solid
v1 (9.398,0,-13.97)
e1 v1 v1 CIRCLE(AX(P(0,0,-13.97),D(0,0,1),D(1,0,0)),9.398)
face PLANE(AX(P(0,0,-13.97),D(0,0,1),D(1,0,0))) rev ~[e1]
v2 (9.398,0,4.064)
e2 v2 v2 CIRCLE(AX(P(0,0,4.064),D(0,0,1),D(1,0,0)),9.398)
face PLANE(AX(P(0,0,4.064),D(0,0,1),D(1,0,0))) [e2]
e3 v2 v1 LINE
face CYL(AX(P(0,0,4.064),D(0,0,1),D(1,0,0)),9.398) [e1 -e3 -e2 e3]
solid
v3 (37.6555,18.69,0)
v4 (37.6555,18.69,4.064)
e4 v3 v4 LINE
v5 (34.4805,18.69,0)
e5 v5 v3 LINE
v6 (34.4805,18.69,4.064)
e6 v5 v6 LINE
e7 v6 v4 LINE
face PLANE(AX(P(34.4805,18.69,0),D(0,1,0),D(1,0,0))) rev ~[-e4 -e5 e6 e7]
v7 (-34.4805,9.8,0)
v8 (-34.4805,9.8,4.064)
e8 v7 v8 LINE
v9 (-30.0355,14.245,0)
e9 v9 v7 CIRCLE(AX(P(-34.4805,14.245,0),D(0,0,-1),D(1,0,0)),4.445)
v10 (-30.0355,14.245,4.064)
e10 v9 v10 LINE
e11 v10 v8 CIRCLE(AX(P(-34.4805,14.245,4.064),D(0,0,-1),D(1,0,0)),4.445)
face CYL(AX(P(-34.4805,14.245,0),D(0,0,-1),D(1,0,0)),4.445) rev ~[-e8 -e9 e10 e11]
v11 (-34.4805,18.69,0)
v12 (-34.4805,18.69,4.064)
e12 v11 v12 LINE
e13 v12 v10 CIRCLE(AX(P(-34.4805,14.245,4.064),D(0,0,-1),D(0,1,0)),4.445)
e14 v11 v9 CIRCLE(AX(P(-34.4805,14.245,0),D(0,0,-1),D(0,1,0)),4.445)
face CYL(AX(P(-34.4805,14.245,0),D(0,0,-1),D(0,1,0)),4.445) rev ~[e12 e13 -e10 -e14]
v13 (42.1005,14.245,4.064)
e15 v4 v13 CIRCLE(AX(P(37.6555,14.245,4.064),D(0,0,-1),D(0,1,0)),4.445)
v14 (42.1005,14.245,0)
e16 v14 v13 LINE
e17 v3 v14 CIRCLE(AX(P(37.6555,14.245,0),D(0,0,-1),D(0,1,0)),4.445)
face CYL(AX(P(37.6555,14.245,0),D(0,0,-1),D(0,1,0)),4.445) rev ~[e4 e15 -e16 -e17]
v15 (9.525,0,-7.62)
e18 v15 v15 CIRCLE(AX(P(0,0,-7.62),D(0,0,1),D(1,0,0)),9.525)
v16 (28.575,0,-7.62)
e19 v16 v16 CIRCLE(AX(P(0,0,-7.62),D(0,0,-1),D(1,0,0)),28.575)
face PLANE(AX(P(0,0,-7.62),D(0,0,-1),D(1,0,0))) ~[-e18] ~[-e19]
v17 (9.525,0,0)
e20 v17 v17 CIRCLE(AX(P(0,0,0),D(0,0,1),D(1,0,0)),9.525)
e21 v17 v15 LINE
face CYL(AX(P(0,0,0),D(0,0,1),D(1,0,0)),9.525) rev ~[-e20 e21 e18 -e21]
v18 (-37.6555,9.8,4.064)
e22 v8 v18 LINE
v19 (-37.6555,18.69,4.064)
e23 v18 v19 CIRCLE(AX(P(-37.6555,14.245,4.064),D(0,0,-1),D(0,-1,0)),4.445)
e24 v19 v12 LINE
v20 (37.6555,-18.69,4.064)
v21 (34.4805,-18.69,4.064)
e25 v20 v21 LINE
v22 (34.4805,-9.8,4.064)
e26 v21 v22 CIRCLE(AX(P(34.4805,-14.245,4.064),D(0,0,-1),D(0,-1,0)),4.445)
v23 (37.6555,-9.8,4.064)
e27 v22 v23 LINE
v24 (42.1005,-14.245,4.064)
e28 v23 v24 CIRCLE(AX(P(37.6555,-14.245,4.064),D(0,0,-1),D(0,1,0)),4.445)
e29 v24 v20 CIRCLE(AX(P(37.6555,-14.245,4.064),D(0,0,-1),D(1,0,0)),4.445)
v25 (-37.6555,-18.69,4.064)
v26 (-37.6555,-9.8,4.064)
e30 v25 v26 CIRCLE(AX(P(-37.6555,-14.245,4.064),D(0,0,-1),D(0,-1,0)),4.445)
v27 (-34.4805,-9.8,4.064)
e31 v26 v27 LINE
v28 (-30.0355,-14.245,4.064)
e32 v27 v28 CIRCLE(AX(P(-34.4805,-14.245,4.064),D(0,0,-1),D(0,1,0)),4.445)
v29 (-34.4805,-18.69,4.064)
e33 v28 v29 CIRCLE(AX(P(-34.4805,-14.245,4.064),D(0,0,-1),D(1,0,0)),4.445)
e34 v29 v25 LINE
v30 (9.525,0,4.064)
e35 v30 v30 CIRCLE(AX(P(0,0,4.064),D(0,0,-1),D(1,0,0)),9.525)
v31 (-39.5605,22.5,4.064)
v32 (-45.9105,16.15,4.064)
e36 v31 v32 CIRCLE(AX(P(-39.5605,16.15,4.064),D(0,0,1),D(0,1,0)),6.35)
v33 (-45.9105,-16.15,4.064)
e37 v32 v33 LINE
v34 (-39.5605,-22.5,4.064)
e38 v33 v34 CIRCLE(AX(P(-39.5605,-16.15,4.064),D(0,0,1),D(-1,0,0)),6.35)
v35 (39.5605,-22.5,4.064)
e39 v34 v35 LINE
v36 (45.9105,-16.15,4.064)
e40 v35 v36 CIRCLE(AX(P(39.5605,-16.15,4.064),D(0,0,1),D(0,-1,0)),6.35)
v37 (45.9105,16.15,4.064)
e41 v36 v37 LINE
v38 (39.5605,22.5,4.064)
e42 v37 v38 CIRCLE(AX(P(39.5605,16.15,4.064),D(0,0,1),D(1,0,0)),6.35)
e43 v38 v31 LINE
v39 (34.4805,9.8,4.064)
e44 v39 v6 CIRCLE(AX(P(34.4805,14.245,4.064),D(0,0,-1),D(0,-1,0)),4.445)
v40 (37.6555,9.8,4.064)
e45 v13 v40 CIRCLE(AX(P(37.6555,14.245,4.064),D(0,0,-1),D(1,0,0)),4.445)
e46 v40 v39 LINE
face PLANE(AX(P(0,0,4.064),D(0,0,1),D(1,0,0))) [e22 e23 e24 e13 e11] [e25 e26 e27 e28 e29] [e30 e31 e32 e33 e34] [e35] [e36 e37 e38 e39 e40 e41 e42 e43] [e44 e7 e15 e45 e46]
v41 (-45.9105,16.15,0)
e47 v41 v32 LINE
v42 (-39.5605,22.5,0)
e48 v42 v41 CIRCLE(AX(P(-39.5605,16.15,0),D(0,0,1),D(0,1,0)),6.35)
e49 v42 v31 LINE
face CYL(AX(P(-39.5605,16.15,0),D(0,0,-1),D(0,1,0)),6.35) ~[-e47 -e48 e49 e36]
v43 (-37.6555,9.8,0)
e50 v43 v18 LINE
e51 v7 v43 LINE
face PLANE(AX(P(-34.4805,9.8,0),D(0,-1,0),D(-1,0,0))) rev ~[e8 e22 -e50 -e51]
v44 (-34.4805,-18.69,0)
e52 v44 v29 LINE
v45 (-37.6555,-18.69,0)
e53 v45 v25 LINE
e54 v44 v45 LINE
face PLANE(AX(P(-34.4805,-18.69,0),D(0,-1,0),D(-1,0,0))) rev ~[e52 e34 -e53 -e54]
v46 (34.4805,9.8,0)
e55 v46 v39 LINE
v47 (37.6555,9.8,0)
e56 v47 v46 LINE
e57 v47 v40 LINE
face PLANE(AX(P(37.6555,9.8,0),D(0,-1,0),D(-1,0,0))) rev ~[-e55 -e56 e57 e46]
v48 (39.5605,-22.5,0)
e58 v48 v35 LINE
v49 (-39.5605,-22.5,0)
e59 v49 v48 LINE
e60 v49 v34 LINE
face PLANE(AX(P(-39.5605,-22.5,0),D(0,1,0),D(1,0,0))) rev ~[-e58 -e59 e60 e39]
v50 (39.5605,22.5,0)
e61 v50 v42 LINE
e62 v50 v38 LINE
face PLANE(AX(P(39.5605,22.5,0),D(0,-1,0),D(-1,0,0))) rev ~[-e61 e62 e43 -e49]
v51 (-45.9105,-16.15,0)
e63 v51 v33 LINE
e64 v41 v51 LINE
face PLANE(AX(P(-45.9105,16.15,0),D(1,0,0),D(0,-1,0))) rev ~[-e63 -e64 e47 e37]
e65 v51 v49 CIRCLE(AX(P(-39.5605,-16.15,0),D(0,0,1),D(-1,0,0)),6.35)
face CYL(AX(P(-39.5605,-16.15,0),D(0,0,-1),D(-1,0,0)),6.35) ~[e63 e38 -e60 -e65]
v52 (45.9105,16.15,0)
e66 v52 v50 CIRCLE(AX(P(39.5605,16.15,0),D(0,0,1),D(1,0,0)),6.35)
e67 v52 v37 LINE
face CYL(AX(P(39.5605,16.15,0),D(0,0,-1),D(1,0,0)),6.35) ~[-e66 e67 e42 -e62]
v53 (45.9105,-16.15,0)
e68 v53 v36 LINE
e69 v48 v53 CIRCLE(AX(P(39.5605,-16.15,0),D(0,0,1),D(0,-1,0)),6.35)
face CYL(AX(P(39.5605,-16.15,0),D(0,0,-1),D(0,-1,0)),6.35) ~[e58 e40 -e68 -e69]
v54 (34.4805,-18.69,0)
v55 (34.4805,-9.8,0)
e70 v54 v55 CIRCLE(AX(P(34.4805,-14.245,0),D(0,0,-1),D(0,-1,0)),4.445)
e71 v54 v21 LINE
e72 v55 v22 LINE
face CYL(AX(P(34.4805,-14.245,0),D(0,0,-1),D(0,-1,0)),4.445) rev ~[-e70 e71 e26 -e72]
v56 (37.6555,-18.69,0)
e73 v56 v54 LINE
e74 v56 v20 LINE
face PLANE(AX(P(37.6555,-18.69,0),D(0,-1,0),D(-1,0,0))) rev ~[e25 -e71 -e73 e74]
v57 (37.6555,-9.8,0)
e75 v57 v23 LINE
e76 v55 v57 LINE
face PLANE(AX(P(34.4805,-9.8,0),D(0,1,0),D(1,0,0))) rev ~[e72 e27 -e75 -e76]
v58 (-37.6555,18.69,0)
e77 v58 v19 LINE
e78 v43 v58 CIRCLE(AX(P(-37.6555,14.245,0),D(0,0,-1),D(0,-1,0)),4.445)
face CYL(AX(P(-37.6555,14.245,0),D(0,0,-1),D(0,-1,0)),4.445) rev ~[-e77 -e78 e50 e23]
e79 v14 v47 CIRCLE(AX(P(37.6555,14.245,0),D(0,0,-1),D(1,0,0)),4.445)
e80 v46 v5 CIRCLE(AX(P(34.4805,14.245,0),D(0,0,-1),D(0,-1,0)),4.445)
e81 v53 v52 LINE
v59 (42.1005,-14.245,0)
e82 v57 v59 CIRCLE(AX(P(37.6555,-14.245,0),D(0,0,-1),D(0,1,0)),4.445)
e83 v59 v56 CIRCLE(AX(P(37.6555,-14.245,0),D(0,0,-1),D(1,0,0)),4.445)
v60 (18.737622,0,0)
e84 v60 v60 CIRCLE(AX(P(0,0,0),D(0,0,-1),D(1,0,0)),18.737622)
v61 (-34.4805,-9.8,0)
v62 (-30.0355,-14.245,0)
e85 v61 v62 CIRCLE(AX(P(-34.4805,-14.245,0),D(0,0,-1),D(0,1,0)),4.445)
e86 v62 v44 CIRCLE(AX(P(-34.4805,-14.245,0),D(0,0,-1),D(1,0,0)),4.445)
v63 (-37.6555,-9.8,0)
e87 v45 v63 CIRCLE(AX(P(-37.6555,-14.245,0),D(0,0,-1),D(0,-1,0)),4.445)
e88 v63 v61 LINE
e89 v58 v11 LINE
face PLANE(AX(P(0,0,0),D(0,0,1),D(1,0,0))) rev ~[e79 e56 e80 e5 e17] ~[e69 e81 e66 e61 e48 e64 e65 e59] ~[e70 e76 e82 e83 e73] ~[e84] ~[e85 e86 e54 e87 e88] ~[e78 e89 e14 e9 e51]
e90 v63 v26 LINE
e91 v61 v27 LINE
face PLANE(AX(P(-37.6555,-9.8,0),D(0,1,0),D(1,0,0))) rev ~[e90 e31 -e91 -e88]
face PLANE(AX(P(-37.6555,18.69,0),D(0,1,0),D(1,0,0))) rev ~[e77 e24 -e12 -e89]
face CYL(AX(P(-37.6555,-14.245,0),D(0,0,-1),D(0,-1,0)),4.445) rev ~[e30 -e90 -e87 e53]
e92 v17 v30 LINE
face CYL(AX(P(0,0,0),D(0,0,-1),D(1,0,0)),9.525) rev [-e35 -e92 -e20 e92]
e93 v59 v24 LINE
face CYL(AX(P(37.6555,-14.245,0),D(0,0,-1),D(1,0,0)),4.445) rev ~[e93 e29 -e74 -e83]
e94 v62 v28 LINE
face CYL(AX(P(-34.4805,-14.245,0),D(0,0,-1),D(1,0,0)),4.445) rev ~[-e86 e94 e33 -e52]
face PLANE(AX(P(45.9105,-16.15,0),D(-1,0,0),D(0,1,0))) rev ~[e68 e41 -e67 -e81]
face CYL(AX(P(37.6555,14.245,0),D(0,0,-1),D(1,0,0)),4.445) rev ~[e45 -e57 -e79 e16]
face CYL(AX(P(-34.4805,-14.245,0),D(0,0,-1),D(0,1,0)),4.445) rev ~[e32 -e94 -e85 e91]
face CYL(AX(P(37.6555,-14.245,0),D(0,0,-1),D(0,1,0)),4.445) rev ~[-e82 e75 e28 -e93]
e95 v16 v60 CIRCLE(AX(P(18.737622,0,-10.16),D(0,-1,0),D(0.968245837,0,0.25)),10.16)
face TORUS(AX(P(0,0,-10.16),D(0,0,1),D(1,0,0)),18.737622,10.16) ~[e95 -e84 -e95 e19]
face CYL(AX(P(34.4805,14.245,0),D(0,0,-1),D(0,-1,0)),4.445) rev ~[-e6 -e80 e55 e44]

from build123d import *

# Parameters (mm, degrees)
F1_DEPTH      = 4.064
F4_R          = 9.525
F5_DEPTH      = 7.621
F5_DEPTH_BACK = 4.065
F6_R          = 9.398
F8_DEPTH      = 18.034


with BuildPart() as f1:
    # F0 (on Top) → F1 (new body)
    with BuildSketch(Plane.XY):
        with BuildLine():
            Line((39.5605, 22.5), (-39.5605, 22.5))
            ThreePointArc((-39.5605, 22.5), (-44.0506280605, 20.6401280605), (-45.9105, 16.15))
            Line((-45.9105, 16.15), (-45.9105, -16.15))
            ThreePointArc((-45.9105, -16.15), (-44.0506280605, -20.6401280605), (-39.5605, -22.5))
            Line((-39.5605, -22.5), (39.5605, -22.5))
            ThreePointArc((39.5605, -22.5), (44.0506280605, -20.6401280605), (45.9105, -16.15))
            Line((45.9105, -16.15), (45.9105, 16.15))
            ThreePointArc((45.9105, 16.15), (44.0506280605, 20.6401280605), (39.5605, 22.5))
        make_face()
        with BuildLine():
            ThreePointArc((-34.4805, -9.8), (-31.3374103576, -11.1019103576), (-30.0355, -14.245))
            ThreePointArc((-30.0355, -14.245), (-31.3374103576, -17.3880896424), (-34.4805, -18.69))
            Line((-34.4805, -18.69), (-37.6555, -18.69))
            ThreePointArc((-37.6555, -18.69), (-42.1005, -14.245), (-37.6555, -9.8))
            Line((-37.6555, -9.8), (-34.4805, -9.8))
        make_face(mode=Mode.SUBTRACT)
        with BuildLine():
            ThreePointArc((34.4805, -18.69), (30.0355, -14.245), (34.4805, -9.8))
            Line((34.4805, -9.8), (37.6555, -9.8))
            ThreePointArc((37.6555, -9.8), (40.7985896424, -11.1019103576), (42.1005, -14.245))
            ThreePointArc((42.1005, -14.245), (40.7985896424, -17.3880896424), (37.6555, -18.69))
            Line((37.6555, -18.69), (34.4805, -18.69))
        make_face(mode=Mode.SUBTRACT)
        with BuildLine():
            ThreePointArc((-34.4805, 18.69), (-31.3374103576, 17.3880896424), (-30.0355, 14.245))
            ThreePointArc((-30.0355, 14.245), (-31.3374103576, 11.1019103576), (-34.4805, 9.8))
            Line((-34.4805, 9.8), (-37.6555, 9.8))
            ThreePointArc((-37.6555, 9.8), (-42.1005, 14.245), (-37.6555, 18.69))
            Line((-37.6555, 18.69), (-34.4805, 18.69))
        make_face(mode=Mode.SUBTRACT)
        with BuildLine():
            ThreePointArc((37.6555, 18.69), (40.7985896424, 17.3880896424), (42.1005, 14.245))
            ThreePointArc((42.1005, 14.245), (40.7985896424, 11.1019103576), (37.6555, 9.8))
            Line((37.6555, 9.8), (34.4805, 9.8))
            ThreePointArc((34.4805, 9.8), (30.0355, 14.245), (34.4805, 18.69))
            Line((34.4805, 18.69), (37.6555, 18.69))
        make_face(mode=Mode.SUBTRACT)
    extrude(amount=F1_DEPTH)

    # F2 (on Front) → F3 (revolve)
    with BuildSketch(Plane.XZ):
        with BuildLine():
            Line((18.7376223006, 0), (0, 0))
            Line((0, 0), (0, -7.62))
            Line((0, -7.62), (28.575, -7.62))
            ThreePointArc((28.575, -7.62), (24.9593262473, -2.1278147432), (18.7376223006, 0))
        make_face()
    revolve(axis=Axis((0, 0, -3.81), (0, 0, -1)))

    # F4 (on Top) → F5 (cut, two sides)
    with BuildSketch(Plane.XY) as f5_sk:
        Circle(F4_R)
    extrude(amount=-F5_DEPTH, mode=Mode.SUBTRACT)
    extrude(f5_sk.sketch, amount=F5_DEPTH_BACK, mode=Mode.SUBTRACT)


with BuildPart() as f8:
    # F6 (on face) → F8 (new body, through all)
    with BuildSketch(Plane.XY.offset(4.064)):
        Circle(F6_R)
    extrude(amount=-F8_DEPTH)


solid = Compound([f1.part, f8.part])
